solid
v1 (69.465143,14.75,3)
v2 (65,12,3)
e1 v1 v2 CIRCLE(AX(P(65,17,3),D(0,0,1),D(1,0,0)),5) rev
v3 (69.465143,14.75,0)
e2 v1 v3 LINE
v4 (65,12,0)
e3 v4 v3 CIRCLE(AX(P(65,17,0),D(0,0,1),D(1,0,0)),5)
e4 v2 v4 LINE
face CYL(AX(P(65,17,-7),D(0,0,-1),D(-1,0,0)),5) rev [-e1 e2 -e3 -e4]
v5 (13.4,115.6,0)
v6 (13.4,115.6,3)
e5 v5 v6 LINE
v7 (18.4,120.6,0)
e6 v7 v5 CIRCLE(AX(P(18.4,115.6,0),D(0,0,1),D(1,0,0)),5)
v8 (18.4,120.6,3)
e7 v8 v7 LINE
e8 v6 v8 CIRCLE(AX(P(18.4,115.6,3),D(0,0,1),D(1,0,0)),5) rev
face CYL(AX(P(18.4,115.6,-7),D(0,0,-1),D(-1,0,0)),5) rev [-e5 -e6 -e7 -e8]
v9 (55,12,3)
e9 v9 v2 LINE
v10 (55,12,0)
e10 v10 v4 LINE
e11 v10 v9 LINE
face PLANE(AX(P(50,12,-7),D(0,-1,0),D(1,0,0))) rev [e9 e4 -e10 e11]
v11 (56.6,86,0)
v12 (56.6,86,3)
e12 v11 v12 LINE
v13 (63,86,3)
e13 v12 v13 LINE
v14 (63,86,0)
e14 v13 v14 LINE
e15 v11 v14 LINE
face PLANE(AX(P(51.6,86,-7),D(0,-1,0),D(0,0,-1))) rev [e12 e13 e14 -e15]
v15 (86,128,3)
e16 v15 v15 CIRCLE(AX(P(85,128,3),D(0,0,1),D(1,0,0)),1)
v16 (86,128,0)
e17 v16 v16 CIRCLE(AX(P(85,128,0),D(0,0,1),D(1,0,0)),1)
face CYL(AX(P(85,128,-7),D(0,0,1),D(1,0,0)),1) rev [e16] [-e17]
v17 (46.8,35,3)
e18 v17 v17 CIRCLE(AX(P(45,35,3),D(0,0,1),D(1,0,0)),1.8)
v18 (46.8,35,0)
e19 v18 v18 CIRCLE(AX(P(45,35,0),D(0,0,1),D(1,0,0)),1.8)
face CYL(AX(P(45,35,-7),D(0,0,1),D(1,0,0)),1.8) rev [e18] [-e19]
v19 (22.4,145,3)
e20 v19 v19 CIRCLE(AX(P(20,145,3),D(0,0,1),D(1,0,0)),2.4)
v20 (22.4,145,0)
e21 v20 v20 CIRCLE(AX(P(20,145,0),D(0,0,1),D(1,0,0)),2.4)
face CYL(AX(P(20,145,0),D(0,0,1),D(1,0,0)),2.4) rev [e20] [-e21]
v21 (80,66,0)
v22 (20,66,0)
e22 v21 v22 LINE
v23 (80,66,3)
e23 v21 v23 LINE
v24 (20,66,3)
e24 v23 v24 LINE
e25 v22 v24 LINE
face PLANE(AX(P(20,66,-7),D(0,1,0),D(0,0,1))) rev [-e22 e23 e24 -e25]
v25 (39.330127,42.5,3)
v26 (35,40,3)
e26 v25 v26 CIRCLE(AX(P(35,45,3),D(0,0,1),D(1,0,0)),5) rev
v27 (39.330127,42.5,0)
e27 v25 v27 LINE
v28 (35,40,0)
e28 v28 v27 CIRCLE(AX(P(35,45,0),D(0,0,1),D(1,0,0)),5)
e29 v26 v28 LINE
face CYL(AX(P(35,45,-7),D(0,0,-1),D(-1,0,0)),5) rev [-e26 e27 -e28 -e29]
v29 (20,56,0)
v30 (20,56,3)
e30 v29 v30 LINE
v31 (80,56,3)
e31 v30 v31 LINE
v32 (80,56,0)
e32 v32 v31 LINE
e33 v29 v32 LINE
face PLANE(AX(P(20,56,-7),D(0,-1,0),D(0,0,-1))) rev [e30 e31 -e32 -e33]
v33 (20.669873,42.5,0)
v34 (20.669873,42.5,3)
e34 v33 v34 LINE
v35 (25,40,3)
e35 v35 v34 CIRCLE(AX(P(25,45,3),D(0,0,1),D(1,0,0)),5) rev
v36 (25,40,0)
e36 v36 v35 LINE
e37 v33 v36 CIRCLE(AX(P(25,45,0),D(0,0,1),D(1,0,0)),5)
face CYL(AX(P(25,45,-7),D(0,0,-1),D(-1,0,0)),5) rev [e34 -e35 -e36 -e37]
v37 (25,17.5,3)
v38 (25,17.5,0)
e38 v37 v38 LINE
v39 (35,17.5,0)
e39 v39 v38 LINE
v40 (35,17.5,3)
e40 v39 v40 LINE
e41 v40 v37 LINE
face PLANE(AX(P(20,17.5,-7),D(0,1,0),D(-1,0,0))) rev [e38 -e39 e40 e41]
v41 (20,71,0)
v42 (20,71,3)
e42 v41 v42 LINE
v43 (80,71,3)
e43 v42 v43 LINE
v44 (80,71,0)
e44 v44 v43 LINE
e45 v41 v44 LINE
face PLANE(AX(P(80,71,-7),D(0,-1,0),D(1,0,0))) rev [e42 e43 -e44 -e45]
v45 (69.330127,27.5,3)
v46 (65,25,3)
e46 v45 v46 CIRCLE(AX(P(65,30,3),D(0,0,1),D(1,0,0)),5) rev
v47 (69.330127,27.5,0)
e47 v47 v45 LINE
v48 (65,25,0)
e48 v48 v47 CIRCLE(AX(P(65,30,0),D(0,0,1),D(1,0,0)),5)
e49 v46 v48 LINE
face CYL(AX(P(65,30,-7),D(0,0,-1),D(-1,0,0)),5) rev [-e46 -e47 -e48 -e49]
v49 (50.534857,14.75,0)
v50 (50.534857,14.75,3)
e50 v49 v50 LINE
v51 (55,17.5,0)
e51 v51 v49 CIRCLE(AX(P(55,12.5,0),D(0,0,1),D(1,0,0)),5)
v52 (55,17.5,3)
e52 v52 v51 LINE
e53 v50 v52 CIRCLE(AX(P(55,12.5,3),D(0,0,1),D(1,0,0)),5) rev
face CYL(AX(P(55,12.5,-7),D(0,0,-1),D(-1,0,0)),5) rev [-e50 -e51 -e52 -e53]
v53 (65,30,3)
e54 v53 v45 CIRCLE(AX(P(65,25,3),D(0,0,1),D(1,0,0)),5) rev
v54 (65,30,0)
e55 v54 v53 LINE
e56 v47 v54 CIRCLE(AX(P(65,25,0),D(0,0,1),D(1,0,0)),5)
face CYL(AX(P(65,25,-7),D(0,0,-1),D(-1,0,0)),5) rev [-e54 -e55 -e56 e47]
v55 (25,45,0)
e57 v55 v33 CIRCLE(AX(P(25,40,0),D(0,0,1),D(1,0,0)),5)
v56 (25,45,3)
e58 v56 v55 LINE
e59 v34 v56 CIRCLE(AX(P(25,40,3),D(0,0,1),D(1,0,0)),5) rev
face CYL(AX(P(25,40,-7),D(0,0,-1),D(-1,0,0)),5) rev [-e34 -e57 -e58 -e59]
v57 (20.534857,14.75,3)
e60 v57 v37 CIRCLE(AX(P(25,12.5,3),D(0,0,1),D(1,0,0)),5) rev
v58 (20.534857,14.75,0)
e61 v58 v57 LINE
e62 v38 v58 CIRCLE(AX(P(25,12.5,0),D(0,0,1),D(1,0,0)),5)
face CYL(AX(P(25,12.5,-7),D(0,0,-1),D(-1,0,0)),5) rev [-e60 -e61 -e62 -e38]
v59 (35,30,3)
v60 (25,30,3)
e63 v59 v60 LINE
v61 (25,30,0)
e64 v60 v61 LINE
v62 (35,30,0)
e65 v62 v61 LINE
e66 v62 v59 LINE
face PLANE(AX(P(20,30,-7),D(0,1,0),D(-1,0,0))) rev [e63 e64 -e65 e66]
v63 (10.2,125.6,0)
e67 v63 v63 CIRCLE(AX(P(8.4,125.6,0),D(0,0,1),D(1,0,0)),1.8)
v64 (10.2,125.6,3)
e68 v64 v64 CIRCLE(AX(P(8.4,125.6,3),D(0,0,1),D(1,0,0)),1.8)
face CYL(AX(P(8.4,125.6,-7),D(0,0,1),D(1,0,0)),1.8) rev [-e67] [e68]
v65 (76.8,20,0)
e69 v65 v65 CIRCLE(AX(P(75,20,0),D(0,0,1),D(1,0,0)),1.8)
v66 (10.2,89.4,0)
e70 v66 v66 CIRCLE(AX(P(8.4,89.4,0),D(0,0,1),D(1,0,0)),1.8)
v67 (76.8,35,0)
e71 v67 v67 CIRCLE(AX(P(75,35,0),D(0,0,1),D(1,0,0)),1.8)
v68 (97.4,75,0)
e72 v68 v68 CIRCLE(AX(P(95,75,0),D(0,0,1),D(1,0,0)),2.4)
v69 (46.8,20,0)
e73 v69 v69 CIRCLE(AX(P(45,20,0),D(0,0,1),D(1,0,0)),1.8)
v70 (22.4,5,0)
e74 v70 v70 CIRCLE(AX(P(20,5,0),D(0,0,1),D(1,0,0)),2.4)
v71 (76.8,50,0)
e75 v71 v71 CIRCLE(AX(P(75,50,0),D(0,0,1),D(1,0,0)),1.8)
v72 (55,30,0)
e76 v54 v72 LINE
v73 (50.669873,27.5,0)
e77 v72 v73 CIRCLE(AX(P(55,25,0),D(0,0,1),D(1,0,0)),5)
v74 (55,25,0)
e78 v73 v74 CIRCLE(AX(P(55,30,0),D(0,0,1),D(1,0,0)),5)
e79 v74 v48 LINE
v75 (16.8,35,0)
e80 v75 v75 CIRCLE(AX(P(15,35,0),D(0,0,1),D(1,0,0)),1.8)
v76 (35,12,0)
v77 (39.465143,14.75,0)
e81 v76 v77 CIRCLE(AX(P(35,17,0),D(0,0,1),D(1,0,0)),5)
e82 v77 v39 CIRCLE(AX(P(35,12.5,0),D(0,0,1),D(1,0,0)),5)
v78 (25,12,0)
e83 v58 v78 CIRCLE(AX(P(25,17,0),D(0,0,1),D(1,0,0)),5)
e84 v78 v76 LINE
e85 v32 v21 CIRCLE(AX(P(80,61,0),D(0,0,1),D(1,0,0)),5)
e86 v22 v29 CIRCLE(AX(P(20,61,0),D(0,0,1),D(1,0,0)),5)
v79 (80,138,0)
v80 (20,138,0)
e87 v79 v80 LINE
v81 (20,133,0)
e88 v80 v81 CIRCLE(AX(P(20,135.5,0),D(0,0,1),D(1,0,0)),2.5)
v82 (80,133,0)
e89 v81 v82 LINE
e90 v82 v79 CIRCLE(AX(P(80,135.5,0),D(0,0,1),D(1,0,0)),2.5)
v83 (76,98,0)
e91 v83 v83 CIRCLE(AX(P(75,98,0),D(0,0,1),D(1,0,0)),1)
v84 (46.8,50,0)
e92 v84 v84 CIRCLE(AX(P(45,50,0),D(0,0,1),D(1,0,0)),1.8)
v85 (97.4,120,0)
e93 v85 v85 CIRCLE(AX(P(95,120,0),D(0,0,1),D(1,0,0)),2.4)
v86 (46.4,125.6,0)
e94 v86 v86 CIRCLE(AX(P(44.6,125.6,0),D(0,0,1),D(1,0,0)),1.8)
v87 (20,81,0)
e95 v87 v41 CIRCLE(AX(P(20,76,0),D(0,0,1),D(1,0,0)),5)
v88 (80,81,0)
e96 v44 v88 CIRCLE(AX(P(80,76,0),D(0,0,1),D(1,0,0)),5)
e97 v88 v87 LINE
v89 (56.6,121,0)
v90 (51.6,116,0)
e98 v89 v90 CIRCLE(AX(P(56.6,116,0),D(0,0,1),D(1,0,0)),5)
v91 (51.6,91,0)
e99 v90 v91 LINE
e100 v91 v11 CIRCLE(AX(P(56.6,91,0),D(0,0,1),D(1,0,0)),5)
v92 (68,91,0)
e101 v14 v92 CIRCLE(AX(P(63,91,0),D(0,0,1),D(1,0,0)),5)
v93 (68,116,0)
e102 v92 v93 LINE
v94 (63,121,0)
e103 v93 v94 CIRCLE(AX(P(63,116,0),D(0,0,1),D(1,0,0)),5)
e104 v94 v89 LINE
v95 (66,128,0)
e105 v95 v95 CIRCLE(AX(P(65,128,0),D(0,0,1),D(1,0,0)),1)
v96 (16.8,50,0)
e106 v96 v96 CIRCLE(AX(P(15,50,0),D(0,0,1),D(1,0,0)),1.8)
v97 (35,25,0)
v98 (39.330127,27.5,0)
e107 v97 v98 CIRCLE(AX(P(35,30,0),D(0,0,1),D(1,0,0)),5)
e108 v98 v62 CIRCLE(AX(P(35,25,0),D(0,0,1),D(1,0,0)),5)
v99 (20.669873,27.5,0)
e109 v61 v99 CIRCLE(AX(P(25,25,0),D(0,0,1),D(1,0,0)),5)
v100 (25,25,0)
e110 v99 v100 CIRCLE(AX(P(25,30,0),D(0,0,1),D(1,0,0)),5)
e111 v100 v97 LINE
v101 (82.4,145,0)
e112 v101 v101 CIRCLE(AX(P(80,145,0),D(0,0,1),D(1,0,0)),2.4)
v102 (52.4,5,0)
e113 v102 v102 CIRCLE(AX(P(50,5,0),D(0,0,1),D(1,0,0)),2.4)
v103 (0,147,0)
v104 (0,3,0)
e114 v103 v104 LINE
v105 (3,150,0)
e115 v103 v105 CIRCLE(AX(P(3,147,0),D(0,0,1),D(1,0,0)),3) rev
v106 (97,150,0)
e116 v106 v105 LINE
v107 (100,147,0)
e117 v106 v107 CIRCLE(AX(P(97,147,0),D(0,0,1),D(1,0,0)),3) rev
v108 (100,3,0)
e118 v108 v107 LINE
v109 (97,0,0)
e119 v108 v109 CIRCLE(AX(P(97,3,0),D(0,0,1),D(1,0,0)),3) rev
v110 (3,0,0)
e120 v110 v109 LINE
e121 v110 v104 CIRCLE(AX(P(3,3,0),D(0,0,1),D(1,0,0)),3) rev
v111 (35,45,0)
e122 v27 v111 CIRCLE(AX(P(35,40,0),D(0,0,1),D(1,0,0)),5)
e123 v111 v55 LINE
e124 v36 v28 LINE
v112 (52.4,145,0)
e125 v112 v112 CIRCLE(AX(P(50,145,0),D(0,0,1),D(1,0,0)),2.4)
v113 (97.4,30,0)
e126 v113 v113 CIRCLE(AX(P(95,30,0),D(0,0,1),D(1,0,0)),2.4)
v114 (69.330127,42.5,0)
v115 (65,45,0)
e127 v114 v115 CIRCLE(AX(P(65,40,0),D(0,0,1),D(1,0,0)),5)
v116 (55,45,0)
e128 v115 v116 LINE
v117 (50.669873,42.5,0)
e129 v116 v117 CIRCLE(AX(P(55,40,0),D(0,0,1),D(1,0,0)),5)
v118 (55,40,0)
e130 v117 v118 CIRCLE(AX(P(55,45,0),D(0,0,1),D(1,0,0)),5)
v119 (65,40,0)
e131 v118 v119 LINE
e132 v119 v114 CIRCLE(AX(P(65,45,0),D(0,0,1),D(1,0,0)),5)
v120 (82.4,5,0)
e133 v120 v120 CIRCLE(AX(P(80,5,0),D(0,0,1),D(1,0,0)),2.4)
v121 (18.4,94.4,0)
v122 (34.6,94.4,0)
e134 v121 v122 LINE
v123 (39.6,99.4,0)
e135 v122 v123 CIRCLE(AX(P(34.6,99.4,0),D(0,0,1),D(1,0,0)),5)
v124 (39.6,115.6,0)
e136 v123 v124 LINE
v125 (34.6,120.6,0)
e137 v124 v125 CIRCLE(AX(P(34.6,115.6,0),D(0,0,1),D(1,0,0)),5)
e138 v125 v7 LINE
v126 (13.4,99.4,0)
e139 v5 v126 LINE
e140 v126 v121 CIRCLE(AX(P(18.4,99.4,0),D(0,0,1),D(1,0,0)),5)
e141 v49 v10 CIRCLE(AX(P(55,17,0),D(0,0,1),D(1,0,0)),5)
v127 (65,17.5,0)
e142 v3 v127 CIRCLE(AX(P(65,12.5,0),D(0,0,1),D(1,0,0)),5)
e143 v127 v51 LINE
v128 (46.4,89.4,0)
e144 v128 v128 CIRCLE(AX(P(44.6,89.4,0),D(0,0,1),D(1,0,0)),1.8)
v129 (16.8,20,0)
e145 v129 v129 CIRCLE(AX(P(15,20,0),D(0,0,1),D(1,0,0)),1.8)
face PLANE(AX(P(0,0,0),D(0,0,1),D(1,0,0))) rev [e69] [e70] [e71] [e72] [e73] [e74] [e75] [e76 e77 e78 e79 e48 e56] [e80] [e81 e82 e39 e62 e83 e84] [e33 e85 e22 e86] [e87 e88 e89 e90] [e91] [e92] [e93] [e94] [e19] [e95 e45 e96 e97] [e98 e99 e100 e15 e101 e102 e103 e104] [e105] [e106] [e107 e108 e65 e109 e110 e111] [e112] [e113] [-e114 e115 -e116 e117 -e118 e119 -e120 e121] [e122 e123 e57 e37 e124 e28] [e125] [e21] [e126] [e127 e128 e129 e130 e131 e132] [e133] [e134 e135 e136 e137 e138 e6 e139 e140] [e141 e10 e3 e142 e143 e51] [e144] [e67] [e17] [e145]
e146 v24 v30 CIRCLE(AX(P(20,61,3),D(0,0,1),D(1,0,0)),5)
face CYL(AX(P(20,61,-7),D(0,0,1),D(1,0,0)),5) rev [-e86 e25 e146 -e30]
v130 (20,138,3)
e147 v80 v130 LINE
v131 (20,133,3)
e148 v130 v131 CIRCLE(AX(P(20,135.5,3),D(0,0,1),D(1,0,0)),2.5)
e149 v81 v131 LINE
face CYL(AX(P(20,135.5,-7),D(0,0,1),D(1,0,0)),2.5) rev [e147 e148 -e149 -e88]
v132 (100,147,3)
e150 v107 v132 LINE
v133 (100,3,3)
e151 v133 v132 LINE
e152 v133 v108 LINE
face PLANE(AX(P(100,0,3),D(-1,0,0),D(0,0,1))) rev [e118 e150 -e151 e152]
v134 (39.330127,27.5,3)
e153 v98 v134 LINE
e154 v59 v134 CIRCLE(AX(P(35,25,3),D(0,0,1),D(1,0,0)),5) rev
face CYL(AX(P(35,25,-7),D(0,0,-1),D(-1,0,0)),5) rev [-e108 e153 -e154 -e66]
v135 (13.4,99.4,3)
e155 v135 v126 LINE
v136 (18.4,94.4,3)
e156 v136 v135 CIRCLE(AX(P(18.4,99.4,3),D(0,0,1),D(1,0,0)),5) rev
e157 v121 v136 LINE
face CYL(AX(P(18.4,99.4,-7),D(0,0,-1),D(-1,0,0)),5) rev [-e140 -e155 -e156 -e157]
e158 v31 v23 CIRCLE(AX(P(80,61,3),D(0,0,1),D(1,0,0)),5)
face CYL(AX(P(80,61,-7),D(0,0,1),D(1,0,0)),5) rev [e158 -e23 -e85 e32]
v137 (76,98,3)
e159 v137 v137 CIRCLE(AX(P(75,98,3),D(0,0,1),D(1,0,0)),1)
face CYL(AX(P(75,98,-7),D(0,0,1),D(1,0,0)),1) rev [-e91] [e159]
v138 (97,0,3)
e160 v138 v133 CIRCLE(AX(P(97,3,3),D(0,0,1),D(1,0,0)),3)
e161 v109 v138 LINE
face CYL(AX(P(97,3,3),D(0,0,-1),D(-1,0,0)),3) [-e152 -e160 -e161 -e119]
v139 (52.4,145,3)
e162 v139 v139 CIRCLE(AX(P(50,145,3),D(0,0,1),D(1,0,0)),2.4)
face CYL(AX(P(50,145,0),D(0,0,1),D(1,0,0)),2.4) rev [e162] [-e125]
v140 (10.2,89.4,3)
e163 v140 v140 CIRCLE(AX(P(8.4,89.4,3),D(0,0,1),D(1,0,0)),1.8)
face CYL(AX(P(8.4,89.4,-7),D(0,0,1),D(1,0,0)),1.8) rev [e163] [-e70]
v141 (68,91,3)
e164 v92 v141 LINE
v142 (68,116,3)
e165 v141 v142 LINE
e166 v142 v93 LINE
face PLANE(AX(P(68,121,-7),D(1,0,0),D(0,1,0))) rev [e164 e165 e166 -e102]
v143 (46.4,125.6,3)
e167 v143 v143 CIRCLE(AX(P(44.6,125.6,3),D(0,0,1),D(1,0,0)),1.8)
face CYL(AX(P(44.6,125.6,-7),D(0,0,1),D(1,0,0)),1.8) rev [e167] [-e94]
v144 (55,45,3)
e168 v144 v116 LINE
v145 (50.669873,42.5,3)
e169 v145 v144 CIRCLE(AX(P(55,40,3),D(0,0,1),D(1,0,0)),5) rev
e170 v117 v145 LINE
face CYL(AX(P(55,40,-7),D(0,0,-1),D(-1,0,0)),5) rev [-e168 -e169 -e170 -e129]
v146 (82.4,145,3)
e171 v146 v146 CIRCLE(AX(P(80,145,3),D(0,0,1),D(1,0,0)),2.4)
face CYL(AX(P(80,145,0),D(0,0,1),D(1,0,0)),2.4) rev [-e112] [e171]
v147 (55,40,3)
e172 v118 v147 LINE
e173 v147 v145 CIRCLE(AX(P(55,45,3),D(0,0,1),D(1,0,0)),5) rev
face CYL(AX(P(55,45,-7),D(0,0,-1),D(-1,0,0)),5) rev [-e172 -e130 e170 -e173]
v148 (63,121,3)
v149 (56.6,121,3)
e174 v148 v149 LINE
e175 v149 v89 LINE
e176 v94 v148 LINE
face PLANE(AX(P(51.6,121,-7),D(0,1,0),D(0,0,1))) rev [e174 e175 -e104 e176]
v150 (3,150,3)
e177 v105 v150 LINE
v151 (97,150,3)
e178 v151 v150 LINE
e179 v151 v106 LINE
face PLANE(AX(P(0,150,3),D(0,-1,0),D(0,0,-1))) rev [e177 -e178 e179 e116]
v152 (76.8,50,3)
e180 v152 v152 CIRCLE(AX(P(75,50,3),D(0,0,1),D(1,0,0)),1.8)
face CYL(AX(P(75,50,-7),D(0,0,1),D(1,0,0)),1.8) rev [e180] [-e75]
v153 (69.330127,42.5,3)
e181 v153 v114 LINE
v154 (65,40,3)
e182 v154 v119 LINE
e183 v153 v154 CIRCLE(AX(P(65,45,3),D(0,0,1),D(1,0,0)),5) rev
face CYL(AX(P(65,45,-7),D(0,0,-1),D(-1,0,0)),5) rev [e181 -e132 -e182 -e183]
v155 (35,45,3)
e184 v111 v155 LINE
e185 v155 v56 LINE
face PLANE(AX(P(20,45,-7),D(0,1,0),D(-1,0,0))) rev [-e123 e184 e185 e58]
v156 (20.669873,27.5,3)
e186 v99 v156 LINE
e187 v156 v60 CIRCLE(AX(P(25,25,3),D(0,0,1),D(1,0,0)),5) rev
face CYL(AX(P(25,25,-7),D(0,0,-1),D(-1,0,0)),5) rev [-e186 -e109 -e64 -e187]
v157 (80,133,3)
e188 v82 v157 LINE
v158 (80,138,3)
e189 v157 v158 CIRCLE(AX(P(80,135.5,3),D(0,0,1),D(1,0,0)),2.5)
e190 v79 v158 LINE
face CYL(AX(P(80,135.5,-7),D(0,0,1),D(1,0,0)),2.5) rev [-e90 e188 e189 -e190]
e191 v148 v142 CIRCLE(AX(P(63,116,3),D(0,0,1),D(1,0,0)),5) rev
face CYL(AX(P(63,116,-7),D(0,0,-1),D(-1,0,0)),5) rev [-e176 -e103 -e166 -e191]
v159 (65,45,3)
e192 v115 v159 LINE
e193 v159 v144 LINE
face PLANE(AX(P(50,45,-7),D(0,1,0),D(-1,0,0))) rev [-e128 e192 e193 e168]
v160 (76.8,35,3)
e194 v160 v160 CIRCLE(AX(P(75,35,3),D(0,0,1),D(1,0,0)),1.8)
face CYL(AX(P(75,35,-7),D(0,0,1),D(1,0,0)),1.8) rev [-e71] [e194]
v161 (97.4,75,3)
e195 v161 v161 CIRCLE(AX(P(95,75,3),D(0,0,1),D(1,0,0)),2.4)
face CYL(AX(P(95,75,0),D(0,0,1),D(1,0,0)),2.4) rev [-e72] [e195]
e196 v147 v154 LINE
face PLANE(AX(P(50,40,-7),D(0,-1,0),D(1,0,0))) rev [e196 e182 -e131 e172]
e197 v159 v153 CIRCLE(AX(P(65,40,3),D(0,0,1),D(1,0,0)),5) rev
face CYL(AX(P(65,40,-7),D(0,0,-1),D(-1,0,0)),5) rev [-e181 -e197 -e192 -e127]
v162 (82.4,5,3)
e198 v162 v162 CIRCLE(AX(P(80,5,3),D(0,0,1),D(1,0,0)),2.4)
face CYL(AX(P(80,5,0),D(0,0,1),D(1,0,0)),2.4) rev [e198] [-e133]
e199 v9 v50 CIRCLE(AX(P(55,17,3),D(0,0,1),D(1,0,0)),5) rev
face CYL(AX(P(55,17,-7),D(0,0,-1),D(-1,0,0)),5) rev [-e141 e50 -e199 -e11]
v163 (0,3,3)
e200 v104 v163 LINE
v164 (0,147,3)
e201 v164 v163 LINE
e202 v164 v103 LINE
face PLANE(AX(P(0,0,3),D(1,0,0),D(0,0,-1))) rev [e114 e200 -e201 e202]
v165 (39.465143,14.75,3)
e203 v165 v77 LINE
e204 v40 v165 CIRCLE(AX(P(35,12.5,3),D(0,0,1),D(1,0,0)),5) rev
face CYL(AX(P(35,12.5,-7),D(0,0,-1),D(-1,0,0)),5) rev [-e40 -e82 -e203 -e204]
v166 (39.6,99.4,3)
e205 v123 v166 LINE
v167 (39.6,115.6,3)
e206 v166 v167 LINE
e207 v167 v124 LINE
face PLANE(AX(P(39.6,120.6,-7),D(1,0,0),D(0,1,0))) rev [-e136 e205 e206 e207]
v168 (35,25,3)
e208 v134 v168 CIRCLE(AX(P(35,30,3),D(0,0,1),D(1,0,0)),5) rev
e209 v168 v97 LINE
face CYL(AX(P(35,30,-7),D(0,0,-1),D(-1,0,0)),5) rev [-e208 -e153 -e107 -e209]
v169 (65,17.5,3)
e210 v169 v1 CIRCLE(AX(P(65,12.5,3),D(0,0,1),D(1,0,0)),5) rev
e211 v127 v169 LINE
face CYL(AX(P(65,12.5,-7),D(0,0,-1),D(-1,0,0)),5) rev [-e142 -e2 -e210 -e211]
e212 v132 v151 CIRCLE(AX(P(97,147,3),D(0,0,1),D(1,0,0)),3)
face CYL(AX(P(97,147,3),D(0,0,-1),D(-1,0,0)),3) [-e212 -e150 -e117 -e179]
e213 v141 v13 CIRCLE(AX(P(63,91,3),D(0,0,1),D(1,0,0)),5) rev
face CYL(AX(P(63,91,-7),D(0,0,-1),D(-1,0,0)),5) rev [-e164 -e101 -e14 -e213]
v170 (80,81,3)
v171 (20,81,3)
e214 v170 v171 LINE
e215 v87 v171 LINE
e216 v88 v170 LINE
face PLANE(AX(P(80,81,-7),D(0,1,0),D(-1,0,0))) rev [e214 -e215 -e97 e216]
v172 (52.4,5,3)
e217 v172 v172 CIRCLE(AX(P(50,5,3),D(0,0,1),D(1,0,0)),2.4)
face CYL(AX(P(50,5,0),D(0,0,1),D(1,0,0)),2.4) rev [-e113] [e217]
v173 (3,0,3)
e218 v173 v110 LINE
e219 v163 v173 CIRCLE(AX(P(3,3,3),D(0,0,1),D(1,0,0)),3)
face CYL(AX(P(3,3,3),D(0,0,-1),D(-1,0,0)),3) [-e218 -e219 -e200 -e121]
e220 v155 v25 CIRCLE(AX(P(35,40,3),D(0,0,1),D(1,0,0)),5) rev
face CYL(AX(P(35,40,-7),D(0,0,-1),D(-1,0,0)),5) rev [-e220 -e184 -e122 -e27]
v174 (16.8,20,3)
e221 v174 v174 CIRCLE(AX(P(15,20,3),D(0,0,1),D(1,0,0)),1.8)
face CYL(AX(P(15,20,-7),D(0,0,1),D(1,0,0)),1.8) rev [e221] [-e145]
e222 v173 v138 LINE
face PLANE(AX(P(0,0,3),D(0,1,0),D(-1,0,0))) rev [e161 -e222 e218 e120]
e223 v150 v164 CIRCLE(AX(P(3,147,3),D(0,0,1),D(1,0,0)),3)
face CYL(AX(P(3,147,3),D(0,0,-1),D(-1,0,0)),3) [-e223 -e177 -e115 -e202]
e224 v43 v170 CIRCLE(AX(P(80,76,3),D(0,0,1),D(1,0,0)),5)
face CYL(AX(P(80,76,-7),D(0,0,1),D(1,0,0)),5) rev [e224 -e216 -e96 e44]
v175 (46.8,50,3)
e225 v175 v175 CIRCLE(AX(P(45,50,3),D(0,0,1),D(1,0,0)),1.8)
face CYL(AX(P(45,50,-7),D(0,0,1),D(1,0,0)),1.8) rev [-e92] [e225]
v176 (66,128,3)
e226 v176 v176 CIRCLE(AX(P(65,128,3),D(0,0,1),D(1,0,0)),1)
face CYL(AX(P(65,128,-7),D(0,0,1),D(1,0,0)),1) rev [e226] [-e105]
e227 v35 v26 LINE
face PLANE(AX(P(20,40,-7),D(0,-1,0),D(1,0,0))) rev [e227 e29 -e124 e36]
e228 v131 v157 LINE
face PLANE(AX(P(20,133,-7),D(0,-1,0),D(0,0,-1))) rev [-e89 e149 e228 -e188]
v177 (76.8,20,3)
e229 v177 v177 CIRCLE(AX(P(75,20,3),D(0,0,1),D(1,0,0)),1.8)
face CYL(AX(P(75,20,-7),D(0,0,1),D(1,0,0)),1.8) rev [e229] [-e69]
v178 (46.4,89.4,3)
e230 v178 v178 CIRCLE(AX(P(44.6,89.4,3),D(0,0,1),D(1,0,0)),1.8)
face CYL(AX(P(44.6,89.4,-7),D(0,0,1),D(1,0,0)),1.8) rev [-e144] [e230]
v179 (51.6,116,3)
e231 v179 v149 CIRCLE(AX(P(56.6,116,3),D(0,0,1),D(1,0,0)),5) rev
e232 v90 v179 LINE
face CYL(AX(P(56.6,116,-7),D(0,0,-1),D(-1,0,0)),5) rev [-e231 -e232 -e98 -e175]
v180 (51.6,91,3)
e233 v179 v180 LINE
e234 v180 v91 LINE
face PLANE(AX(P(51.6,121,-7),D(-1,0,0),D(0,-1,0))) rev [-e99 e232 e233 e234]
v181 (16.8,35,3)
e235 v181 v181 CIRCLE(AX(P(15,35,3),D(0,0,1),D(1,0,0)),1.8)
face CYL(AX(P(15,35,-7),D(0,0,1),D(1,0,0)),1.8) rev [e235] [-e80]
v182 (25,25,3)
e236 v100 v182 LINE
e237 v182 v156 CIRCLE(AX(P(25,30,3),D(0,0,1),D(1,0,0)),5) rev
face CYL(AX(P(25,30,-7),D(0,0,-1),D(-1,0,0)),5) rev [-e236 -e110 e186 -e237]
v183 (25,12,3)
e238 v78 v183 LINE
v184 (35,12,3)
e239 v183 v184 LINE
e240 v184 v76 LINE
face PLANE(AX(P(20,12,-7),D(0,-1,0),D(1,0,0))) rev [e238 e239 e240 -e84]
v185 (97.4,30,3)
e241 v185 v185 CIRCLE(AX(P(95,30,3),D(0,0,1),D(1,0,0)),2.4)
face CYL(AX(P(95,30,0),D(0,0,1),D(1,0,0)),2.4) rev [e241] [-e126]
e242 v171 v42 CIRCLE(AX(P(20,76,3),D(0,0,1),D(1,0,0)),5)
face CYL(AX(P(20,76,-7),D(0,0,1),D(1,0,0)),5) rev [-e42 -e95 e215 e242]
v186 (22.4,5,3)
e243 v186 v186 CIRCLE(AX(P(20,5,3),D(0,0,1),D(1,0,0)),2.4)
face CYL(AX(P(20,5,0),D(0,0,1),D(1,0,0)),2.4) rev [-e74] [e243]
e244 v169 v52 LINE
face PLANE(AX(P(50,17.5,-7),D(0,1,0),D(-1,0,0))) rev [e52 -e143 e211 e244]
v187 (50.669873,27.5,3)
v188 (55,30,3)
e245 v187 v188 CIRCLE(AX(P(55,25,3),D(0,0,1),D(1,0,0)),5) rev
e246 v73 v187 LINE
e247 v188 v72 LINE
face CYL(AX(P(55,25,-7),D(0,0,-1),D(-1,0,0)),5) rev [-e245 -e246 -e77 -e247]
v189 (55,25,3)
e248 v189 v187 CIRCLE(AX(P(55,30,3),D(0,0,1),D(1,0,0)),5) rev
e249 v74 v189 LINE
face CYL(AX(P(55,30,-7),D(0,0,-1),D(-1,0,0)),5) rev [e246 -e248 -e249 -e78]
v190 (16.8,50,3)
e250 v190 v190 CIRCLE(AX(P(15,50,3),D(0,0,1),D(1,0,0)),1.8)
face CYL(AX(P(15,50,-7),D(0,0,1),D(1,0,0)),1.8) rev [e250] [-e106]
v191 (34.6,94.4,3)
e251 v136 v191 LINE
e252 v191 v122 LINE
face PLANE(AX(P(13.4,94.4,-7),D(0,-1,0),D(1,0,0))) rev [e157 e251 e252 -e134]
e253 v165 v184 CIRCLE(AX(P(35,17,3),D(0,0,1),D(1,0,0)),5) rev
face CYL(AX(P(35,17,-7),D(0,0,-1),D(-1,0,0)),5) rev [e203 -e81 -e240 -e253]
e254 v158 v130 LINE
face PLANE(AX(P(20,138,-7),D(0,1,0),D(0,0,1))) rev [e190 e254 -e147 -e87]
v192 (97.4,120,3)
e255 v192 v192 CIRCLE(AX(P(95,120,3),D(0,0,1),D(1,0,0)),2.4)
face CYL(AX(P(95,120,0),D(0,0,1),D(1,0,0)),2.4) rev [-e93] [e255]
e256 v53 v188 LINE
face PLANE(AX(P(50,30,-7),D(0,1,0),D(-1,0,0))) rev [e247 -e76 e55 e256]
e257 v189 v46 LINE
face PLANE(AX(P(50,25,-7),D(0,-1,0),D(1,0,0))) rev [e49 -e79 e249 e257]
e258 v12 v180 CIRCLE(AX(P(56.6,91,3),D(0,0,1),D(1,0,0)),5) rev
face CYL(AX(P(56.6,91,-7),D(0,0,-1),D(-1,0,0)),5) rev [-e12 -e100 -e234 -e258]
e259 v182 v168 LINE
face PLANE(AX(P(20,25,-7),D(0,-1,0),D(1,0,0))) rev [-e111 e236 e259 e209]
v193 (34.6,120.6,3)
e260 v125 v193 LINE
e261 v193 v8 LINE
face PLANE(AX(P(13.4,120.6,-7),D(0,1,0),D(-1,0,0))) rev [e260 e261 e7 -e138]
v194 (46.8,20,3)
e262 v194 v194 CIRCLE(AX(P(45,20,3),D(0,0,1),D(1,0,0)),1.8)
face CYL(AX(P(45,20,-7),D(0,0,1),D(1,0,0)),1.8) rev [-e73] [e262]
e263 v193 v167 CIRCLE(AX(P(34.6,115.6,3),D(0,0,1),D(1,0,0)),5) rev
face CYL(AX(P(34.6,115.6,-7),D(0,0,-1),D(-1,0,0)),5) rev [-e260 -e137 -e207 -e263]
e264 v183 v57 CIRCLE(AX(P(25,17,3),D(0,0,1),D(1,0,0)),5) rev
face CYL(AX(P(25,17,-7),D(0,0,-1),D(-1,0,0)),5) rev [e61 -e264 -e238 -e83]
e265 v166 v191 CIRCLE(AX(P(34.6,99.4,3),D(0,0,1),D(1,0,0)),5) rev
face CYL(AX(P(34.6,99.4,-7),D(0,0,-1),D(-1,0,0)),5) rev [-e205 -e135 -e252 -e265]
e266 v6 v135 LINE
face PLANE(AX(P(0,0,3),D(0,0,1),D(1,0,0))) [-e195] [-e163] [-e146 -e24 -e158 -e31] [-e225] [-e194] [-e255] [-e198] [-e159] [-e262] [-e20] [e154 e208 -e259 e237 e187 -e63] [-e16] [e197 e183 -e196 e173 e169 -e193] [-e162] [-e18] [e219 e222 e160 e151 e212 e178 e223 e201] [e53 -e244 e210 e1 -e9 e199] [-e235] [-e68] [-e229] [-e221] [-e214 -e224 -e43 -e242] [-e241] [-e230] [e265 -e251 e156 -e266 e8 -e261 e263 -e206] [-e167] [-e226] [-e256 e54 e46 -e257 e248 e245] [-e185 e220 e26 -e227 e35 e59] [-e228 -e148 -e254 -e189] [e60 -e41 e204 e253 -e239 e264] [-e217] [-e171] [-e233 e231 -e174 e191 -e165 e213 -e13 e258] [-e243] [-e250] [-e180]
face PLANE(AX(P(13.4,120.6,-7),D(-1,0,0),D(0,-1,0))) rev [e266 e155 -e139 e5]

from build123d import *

# Parameters (mm, degrees)
ESQUISSE1_W             = 100
ESQUISSE1_H             = 150
BOSS_EXTRU_1_DEPTH      = 3
ESQUISSE3_R             = 2.4
ENL_V_MAT_EXTRU_2_DEPTH = 3
ESQUISSE4_R             = 1.8
ESQUISSE4_R_2           = 1
ESQUISSE4_W             = 20
ESQUISSE4_H             = 5
ESQUISSE4_W_2           = 26.2
ESQUISSE4_H_2           = 26.2
ESQUISSE4_W_3           = 16.4
ESQUISSE4_H_3           = 35
ESQUISSE4_H_4           = 5.5
ENL_V_MAT_EXTRU_3_DEPTH = 10
CONG_1_R                = 5
CONG_2_R                = 3


with BuildPart() as part:
    # Esquisse1 → Boss.-Extru.1 (new body)
    with BuildSketch(Plane.XY):
        with Locations((50, 75)):
            Rectangle(ESQUISSE1_W, ESQUISSE1_H)
    extrude(amount=BOSS_EXTRU_1_DEPTH)

    # Esquisse3 → Enlèv. mat.-Extru.2 (cut)
    with BuildSketch(Plane.XY.offset(3)):
        with Locations((20, 145)):
            Circle(ESQUISSE3_R)
        with Locations((50, 145)):
            Circle(ESQUISSE3_R)
        with Locations((80, 145)):
            Circle(ESQUISSE3_R)
        with Locations((95, 120)):
            Circle(ESQUISSE3_R)
        with Locations((95, 75)):
            Circle(ESQUISSE3_R)
        with Locations((95, 30)):
            Circle(ESQUISSE3_R)
        with Locations((80, 5)):
            Circle(ESQUISSE3_R)
        with Locations((50, 5)):
            Circle(ESQUISSE3_R)
        with Locations((20, 5)):
            Circle(ESQUISSE3_R)
    extrude(amount=-ENL_V_MAT_EXTRU_2_DEPTH, mode=Mode.SUBTRACT)

    # Esquisse4 → Enlèv. mat.-Extru.3 (cut)
    with BuildSketch(Plane.XY.offset(3)):
        with Locations((44.6, 89.4)):
            Circle(ESQUISSE4_R)
        with Locations((8.4, 125.6)):
            Circle(ESQUISSE4_R)
        with Locations((44.6, 125.6)):
            Circle(ESQUISSE4_R)
        with Locations((85, 128)):
            Circle(ESQUISSE4_R_2)
        with Locations((65, 128)):
            Circle(ESQUISSE4_R_2)
        with Locations((75, 98)):
            Circle(ESQUISSE4_R_2)
        with Locations((8.4, 89.4)):
            Circle(ESQUISSE4_R)
        with Locations((15, 50)):
            Circle(ESQUISSE4_R)
        with Locations((45, 35)):
            Circle(ESQUISSE4_R)
        with Locations((15, 20)):
            Circle(ESQUISSE4_R)
        with Locations((45, 50)):
            Circle(ESQUISSE4_R)
        with Locations((15, 35)):
            Circle(ESQUISSE4_R)
        with Locations((45, 20)):
            Circle(ESQUISSE4_R)
        with Locations((75, 20)):
            Circle(ESQUISSE4_R)
        with Locations((75, 35)):
            Circle(ESQUISSE4_R)
        with Locations((75, 50)):
            Circle(ESQUISSE4_R)
        with BuildLine():
            Line((80, 71), (20, 71))
            ThreePointArc((20, 71), (15, 76), (20, 81))
            Line((20, 81), (80, 81))
            ThreePointArc((80, 81), (85, 76), (80, 71))
        make_face()
        with Locations((30, 42.5)):
            Rectangle(ESQUISSE4_W, ESQUISSE4_H)
        with Locations((60, 42.5)):
            Rectangle(ESQUISSE4_W, ESQUISSE4_H)
        with Locations((60, 27.5)):
            Rectangle(ESQUISSE4_W, ESQUISSE4_H)
        with Locations((30, 27.5)):
            Rectangle(ESQUISSE4_W, ESQUISSE4_H)
        with Locations((26.5, 107.5)):
            Rectangle(ESQUISSE4_W_2, ESQUISSE4_H_2)
        with Locations((59.8, 103.5)):
            Rectangle(ESQUISSE4_W_3, ESQUISSE4_H_3)
        with Locations((30, 14.75)):
            Rectangle(ESQUISSE4_W, ESQUISSE4_H_4)
        with Locations((60, 14.75)):
            Rectangle(ESQUISSE4_W, ESQUISSE4_H_4)
        with BuildLine():
            Line((20, 66), (80, 66))
            ThreePointArc((80, 66), (85, 61), (80, 56))
            Line((80, 56), (20, 56))
            ThreePointArc((20, 56), (15, 61), (20, 66))
        make_face()
        with BuildLine():
            Line((20, 138), (80, 138))
            ThreePointArc((80, 138), (82.5, 135.5), (80, 133))
            Line((80, 133), (20, 133))
            ThreePointArc((20, 133), (17.5, 135.5), (20, 138))
        make_face()
    extrude(amount=-ENL_V_MAT_EXTRU_3_DEPTH, mode=Mode.SUBTRACT)

    # Congé1
    # the kernel refuses this fillet: 5 mm, written as the material it adds along each edge
    with BuildSketch(Plane(origin=(50, 25, 3), x_dir=(0, 1, 0), z_dir=(0, 0, -1)), Plane(origin=(20, 25, 3), x_dir=(0, 1, 0), z_dir=(0, 0, -1)), Plane(origin=(13.4, 94.4, 3), x_dir=(0, 1, 0), z_dir=(0, 0, -1)), Plane(origin=(50, 40, 3), x_dir=(0, 1, 0), z_dir=(0, 0, -1)), Plane(origin=(20, 40, 3), x_dir=(0, 1, 0), z_dir=(0, 0, -1)), Plane(origin=(20, 12, 3), x_dir=(0, 1, 0), z_dir=(0, 0, -1)), Plane(origin=(50, 12, 3), x_dir=(0, 1, 0), z_dir=(0, 0, -1)), Plane(origin=(68, 121, 3), x_dir=(0, -1, 0), z_dir=(0, 0, -1))) as cong_1_piece_1:
        with BuildLine():
            CenterArc((CONG_1_R, CONG_1_R), CONG_1_R, 180, 90)
            Line((0, CONG_1_R), (0, 0))
            Line((0, 0), (CONG_1_R, 0))
        make_face()
    extrude(amount=3)
    with BuildSketch(Plane(origin=(50, 45, 3), x_dir=(0, -1, 0), z_dir=(0, 0, -1)), Plane(origin=(40, 45, 3), x_dir=(-1, 0, 0), z_dir=(0, 0, -1)), Plane(origin=(40, 25, 3), x_dir=(0, 1, 0), z_dir=(0, 0, -1)), Plane(origin=(20, 45, 3), x_dir=(0, -1, 0), z_dir=(0, 0, -1)), Plane(origin=(39.6, 94.4, 3), x_dir=(0, 1, 0), z_dir=(0, 0, -1)), Plane(origin=(39.6, 120.6, 3), x_dir=(-1, 0, 0), z_dir=(0, 0, -1)), Plane(origin=(13.4, 120.6, 3), x_dir=(0, -1, 0), z_dir=(0, 0, -1)), Plane(origin=(70, 40, 3), x_dir=(0, 1, 0), z_dir=(0, 0, -1)), Plane(origin=(70, 45, 3), x_dir=(-1, 0, 0), z_dir=(0, 0, -1)), Plane(origin=(50, 30, 3), x_dir=(0, -1, 0), z_dir=(0, 0, -1)), Plane(origin=(70, 30, 3), x_dir=(-1, 0, 0), z_dir=(0, 0, -1)), Plane(origin=(70, 25, 3), x_dir=(0, 1, 0), z_dir=(0, 0, -1)), Plane(origin=(40, 40, 3), x_dir=(0, 1, 0), z_dir=(0, 0, -1)), Plane(origin=(40, 30, 3), x_dir=(-1, 0, 0), z_dir=(0, 0, -1)), Plane(origin=(20, 30, 3), x_dir=(0, -1, 0), z_dir=(0, 0, -1)), Plane(origin=(20, 17.5, 3), x_dir=(0, -1, 0), z_dir=(0, 0, -1)), Plane(origin=(40, 12, 3), x_dir=(0, 1, 0), z_dir=(0, 0, -1)), Plane(origin=(40, 17.5, 3), x_dir=(-1, 0, 0), z_dir=(0, 0, -1)), Plane(origin=(50, 17.5, 3), x_dir=(0, -1, 0), z_dir=(0, 0, -1)), Plane(origin=(70, 12, 3), x_dir=(0, 1, 0), z_dir=(0, 0, -1)), Plane(origin=(70, 17.5, 3), x_dir=(-1, 0, 0), z_dir=(0, 0, -1)), Plane(origin=(51.6, 86, 3), x_dir=(1, 0, 0), z_dir=(0, 0, -1)), Plane(origin=(68, 86, 3), x_dir=(0, 1, 0), z_dir=(0, 0, -1)), Plane(origin=(51.6, 121, 3), x_dir=(0, -1, 0), z_dir=(0, 0, -1))) as cong_1_piece_2:
        with BuildLine():
            CenterArc((CONG_1_R, -CONG_1_R), CONG_1_R, 90, 90)
            Line((0, -CONG_1_R), (0, 0))
            Line((0, 0), (CONG_1_R, 0))
        make_face()
    extrude(amount=3)

    # Congé2
    cong_2_edges = [part.edges().sort_by_distance(p)[0] for p in [
        (0, 0, 1.5),
        (0, 150, 1.5),
        (100, 150, 1.5),
        (100, 0, 1.5),
    ]]
    fillet(cong_2_edges, radius=CONG_2_R)


solid = part.part
